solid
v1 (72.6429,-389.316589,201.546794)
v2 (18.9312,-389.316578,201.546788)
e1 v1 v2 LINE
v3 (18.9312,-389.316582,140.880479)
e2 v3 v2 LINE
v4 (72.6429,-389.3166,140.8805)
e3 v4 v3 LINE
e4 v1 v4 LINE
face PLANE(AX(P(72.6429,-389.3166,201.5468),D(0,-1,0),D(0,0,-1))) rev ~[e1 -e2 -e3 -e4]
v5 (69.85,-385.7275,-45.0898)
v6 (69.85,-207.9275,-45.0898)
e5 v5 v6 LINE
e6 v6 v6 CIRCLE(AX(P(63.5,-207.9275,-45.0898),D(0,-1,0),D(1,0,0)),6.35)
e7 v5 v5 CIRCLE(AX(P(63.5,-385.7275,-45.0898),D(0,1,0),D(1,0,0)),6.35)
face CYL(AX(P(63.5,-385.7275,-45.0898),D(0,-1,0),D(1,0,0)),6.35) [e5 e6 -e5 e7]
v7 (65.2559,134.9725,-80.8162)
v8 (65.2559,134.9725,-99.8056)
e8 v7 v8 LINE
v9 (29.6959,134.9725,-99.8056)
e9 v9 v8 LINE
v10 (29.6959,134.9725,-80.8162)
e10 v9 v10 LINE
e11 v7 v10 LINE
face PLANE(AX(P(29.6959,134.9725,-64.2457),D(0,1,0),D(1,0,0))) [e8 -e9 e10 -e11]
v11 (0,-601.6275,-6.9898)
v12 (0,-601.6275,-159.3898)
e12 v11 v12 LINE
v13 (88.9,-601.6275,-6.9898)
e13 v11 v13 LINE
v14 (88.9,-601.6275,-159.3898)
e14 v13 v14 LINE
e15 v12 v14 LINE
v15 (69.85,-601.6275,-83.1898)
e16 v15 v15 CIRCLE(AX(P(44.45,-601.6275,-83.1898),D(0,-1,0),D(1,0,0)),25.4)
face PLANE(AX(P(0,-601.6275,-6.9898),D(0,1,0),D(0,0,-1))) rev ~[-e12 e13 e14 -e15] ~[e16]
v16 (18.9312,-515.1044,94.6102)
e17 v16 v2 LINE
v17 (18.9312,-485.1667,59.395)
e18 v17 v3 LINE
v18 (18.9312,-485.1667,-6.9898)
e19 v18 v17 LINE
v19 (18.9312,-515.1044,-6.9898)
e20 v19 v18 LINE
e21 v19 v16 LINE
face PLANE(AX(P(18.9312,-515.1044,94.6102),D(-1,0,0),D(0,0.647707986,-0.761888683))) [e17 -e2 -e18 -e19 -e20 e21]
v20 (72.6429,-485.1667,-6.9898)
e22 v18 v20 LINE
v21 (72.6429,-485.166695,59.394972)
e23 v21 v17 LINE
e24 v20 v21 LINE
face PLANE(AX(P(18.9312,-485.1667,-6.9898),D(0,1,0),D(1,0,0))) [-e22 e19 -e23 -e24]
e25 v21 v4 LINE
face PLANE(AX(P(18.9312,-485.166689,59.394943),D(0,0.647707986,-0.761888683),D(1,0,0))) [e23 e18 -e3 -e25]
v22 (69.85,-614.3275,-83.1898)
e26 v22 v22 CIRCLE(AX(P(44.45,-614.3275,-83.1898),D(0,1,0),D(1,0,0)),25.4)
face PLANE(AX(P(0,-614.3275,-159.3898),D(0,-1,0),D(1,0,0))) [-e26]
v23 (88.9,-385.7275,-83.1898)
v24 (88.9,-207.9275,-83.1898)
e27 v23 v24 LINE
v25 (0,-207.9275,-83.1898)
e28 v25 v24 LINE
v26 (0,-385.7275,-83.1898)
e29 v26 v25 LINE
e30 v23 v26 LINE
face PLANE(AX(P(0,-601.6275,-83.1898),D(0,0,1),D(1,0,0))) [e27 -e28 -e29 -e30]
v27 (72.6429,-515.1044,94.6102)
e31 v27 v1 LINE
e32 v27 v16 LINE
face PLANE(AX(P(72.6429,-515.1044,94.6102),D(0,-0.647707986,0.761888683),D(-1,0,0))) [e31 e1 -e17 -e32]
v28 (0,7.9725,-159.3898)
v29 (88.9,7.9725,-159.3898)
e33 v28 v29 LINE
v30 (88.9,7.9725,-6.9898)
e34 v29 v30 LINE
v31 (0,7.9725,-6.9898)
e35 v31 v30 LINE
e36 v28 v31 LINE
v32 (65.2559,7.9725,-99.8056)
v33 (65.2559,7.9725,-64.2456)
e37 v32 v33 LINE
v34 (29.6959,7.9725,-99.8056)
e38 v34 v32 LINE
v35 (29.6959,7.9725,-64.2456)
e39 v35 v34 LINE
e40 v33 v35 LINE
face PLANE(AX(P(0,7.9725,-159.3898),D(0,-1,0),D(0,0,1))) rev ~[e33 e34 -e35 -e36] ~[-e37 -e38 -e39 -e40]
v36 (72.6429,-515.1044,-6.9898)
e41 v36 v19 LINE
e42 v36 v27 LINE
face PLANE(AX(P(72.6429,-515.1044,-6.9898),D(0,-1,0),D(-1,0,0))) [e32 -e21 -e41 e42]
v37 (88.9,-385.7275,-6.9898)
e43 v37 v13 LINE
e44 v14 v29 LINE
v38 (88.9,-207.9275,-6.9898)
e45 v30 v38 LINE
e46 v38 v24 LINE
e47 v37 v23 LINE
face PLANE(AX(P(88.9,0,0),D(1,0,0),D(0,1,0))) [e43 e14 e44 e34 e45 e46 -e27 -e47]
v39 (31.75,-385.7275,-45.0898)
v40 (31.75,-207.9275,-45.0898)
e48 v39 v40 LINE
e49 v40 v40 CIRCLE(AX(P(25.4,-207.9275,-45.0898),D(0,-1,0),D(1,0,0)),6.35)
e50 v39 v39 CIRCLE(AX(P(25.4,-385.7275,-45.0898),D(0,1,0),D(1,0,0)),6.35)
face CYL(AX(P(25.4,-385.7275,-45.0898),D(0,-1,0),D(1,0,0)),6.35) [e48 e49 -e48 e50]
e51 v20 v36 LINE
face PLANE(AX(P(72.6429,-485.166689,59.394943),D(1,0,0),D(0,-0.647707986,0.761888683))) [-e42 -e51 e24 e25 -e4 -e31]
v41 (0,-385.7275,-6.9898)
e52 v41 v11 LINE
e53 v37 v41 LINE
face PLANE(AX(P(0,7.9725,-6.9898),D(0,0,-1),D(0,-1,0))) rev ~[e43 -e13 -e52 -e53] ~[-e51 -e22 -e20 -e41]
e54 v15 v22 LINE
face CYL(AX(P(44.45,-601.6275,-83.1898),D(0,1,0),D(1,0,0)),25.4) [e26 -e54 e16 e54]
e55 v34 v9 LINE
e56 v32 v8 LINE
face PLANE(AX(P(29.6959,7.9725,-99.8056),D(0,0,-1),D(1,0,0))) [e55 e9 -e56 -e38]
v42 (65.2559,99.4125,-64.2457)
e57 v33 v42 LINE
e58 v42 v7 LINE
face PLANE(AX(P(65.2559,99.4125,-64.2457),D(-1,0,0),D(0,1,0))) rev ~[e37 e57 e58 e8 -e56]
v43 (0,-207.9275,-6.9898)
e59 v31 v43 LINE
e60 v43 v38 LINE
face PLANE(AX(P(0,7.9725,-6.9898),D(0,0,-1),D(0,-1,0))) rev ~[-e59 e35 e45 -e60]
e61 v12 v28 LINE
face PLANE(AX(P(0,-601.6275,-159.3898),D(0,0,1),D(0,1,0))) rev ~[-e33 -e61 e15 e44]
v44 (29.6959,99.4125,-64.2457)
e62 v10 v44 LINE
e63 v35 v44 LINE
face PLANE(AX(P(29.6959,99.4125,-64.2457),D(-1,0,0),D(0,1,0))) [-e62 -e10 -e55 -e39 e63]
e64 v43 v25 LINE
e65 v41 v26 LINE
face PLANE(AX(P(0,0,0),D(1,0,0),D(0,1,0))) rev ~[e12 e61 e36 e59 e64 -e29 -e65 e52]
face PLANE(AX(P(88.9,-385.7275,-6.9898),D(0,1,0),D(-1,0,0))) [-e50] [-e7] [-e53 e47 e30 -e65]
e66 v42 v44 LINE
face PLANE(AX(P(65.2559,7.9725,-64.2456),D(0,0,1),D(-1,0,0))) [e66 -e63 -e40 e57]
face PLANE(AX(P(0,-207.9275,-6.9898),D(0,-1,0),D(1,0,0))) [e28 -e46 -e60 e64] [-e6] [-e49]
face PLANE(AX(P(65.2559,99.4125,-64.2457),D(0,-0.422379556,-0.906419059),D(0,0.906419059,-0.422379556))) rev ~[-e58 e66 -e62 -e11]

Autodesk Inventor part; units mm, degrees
ref_plane "YZ Plane" through (0, 0, 0) normal (1, 0, 0) x (0, 1, 0)
ref_plane "XZ Plane" through (0, 0, 0) normal (0, 1, 0) x (-1, 0, 0)
ref_plane "XY Plane" through (0, 0, 0) normal (0, 0, 1) x (1, 0, 0)
sketch "Sketch1" plane through (0, 0, 0) normal (1, 0, 0) x (0, 1, 0)
  line L0 (7.9725, -6.9898) -> (-601.6275, -6.9898)
  line L1 (-601.6275, -6.9898) -> (-601.6275, -159.3898)
  line L2 (-601.6275, -159.3898) -> (7.9725, -159.3898)
  line L3 (7.9725, -159.3898) -> (7.9725, -6.9898)
  point P0 (0, 0)
  dimension "d0" = 609.6
  dimension "d1" = 152.4
extrude "Extrusion1" add sketch "Sketch1" along normal blind 88.9
sketch "Sketch2" plane through (0, -601.6275, -6.9898) normal (0, 0, 1) x (1, 0, 0)
  line L0 (0, 0) -> (0, 609.6) projected
  line L1 (0, 609.6) -> (0, 393.7)
  line L2 (0, 0) -> (88.9, 0) projected
  line L3 (0, 0) -> (0, 215.9)
  line L4 (88.9, 0) -> (88.9, 609.6) projected
  line L5 (0, 393.7) -> (88.9, 393.7)
  line L6 (88.9, 393.7) -> (88.9, 215.9)
  line L7 (88.9, 215.9) -> (0, 215.9)
  line L8 (0, 215.9) -> (0, 393.7)
  line L9 (0, 393.7) -> (0, 215.9)
  point P0 (0, 601.6275)
  point P1 (0, 215.9)
  dimension "d4" = 215.9
  dimension "d5" = 215.9
extrude "Extrusion2" cut sketch "Sketch2" against normal blind 76.2 contours L0 L5 L4 L7
sketch "Sketch3" plane through (88.9, 0, 0) normal (1, 0, 0) x (0, 0, -1)
  point P0 (0, 0)
sketch "Sketch4" plane through (0, -601.6275, -6.9898) normal (0, 0, 1) x (1, 0, 0)
  line L0 (18.9312, 116.4608) -> (72.6429, 116.4608)
  line L1 (72.6429, 116.4608) -> (72.6429, 86.5231)
  line L2 (72.6429, 86.5231) -> (18.9312, 86.5231)
  line L3 (18.9312, 86.5231) -> (18.9312, 116.4608)
  point P0 (0, 601.6275)
extrude "Extrusion3" add sketch "Sketch4" along normal blind 101.6
sketch "Sketch5" plane through (72.6429, -515.1044, -6.9898) normal (1, 0, 0) x (0, 0, -1)
  line L0 (-101.6, 0) -> (-66.3848, 29.9377)
  line L1 (0, 29.9377) -> (-101.6, 29.9377) projected
  line L2 (-101.6, 0) -> (-101.6, 29.9377) projected
  line L3 (-101.6, 0) -> (-101.6, 29.9377)
  point P0 (-6.9898, 515.1044)
extrude "Extrusion4" cut sketch "Sketch5" against normal through all
sketch "Sketch6" plane through (18.9312, -515.1044, 94.6102) normal (0, 0.7618887, 0.647708) x (1, 0, 0)
  line L0 (0, 46.221) -> (53.7117, 46.221) projected
  line L1 (53.7117, 77.4079) -> (53.7117, 0) projected
  line L2 (0, 46.221) -> (53.7117, 46.221)
  line L3 (53.7117, 46.221) -> (53.7117, 0)
  line L4 (53.7117, 0) -> (0, 0)
  line L5 (0, 0) -> (0, 46.221)
  point P0 (-18.9312, 405.7197)
extrude "Extrusion5" add sketch "Sketch6" along normal blind 165.1
sketch "Sketch7" plane through (72.6429, -515.1044, -6.9898) normal (1, 0, 0) x (0, 0, -1)
  point P0 (-6.9898, 515.1044)
sketch "Sketch8" plane through (72.6429, -515.1044, -6.9898) normal (1, 0, 0) x (0, 0, -1)
  line L0 (-173.3214, 155.7255) -> (-208.5366, 125.7878) projected
  line L1 (-208.5366, 125.7878) -> (-147.8703, 125.7878)
  line L2 (-66.3848, 29.9377) -> (-173.3214, 155.7255) projected
  line L3 (-173.3214, 155.7255) -> (-208.5366, 125.7878)
  line L4 (-147.8703, 125.7878) -> (-173.3214, 155.7255)
  point P0 (-6.9898, 515.1044)
extrude "Extrusion6" cut sketch "Sketch8" against normal through all
sketch "Sketch9" plane through (72.6429, -389.3166, 201.5467) normal (0, 1, 0) x (1, 0, 0)
  point P0 (-72.6429, 201.5467)
sketch "Sketch10" plane through (0, -385.7275, -6.9898) normal (0, 1, 0) x (1, 0, 0)
  point P0 (0, -6.9898)
sketch "Sketch11" plane through (0, -385.7275, -6.9898) normal (0, 1, 0) x (1, 0, 0)
  point P0 (0, -6.9898)
sketch "Sketch12" plane through (0, -385.7275, -6.9898) normal (0, 1, 0) x (1, 0, 0)
  point P0 (0, -6.9898)
sketch "Sketch13" plane through (0, 0, 0) normal (-1, 0, 0) x (0, 0, 1)
  point P0 (0, 0)
sketch "Sketch14" plane through (0, -385.7275, -6.9898) normal (0, 1, 0) x (1, 0, 0)
  line L0 (88.9, 76.2) -> (0, 76.2) projected
  line L1 (0, 0) -> (0, 76.2) projected
  line L2 (88.9, 76.2) -> (0, 76.2)
  line L3 (88.9, 76.2) -> (88.9, 0) projected
  line L4 (0, 76.2) -> (88.9, 76.2)
  line L5 (88.9, 76.2) -> (0, 76.2)
  line L6 (0, 76.2) -> (0, 0)
  line L7 (0, 0) -> (88.9, 0)
  line L8 (88.9, 0) -> (88.9, 76.2)
  point P0 (0, -6.9898)
sketch "Sketch15" plane through (0, -385.7275, -6.9898) normal (0, 1, 0) x (1, 0, 0)
  line L0 (88.9, 76.2) -> (88.9, 0) projected
  line L1 (88.9, 38.1) -> (0, 38.1)
  line L2 (0, 0) -> (0, 76.2) projected
  line L3 (88.9, 76.2) -> (0, 76.2)
  circle A0 centre (63.5, 38.1) radius 6.35
  circle A1 centre (25.4, 38.1) radius 6.35
  point P0 (0, -6.9898)
  dimension "d20" = 12.7
  dimension "d21" = 12.7
extrude "Extrusion7" add sketch "Sketch15" along normal blind 177.8 contours A0 L1 | L1 A0 | A1 L1 | L1 A1
sketch "Sketch16" plane through (0, 7.9725, -6.9898) normal (0, 1, 0) x (1, 0, 0)
  line L0 (29.6959, 92.8158) -> (65.2559, 92.8158)
  line L1 (65.2559, 92.8158) -> (65.2559, 57.2558)
  line L2 (65.2559, 57.2558) -> (29.6959, 57.2558)
  line L3 (29.6959, 57.2558) -> (29.6959, 92.8158)
  point P0 (0, -6.9898)
  dimension "d24" = 35.56
  dimension "d25" = 35.56
extrude "Extrusion8" add sketch "Sketch16" along normal blind 127
sketch "Sketch17" plane through (29.6959, 7.9725, -64.2457) normal (0, 0, 1) x (1, 0, 0)
  line L0 (0, 127) -> (35.56, 127) projected
  line L1 (35.56, 0) -> (35.56, 127) projected
  line L2 (0, 127) -> (35.56, 127)
  line L3 (35.56, 127) -> (35.56, 91.44)
  line L4 (35.56, 91.44) -> (0, 91.44)
  line L5 (0, 91.44) -> (0, 127)
  point P0 (-29.6959, -7.9725)
  dimension "d28" = 35.56
extrude "Extrusion9" add sketch "Sketch17" along normal blind 127
sketch "Sketch18" plane through (65.2559, 7.9725, -64.2457) normal (1, 0, 0) x (0, 0, -1)
  line L0 (0, 91.44) -> (-127, 91.44) projected
  line L1 (-64.2457, 91.44) -> (-45.72, 127)
  line L2 (35.56, 127) -> (-127, 127) projected
  line L3 (-45.72, 127) -> (-127, 127)
  line L4 (-127, 127) -> (-127, 91.44) projected
  line L5 (-127, 91.44) -> (-64.2457, 91.44)
  line L6 (-127, 127) -> (-127, 91.44)
  line L7 (35.56, 127) -> (-127, 127) projected
  line L8 (0, 127) -> (-14.8626, 91.44)
  line L9 (-64.2457, 91.44) -> (-14.8626, 91.44)
  line L10 (-14.8626, 91.44) -> (0, 127)
  line L11 (-45.72, 127) -> (-127, 127)
  line L12 (0, 127) -> (-49.9714, 127)
  point P0 (-64.2457, -7.9725)
extrude "Extrusion10" cut sketch "Sketch18" against normal through all contours L0 L4 L2 L1
sketch "Sketch19" plane through (65.2559, 7.9725, -64.2457) normal (1, 0, 0) x (0, 0, -1)
  line L0 (0, 91.44) -> (-64.2457, 91.44) projected
  line L1 (-32.1228, 91.44) -> (-14.9944, 127)
  line L2 (35.56, 127) -> (-45.72, 127) projected
  line L3 (-32.1228, 91.44) -> (-64.2457, 91.44)
  line L4 (-64.2457, 91.44) -> (-45.72, 127) projected
  line L5 (-64.2457, 91.44) -> (-45.72, 127)
  line L6 (-45.72, 127) -> (-14.9944, 127)
  point P0 (-64.2457, -7.9725)
extrude "Extrusion11" cut sketch "Sketch19" against normal through all
sketch "Sketch20" plane through (65.2559, 7.9725, -64.2457) normal (1, 0, 0) x (0, 0, -1)
  line L0 (35.56, 127) -> (-14.9944, 127) projected
  line L1 (-0.2658, 127) -> (-21.0098, 91.44)
  line L2 (0, 91.44) -> (-32.1228, 91.44) projected
  line L3 (-21.0098, 91.44) -> (-32.1228, 91.44)
  line L4 (-32.1228, 91.44) -> (-14.9944, 127) projected
  line L5 (-32.1228, 91.44) -> (-14.9944, 127)
  line L6 (-14.9944, 127) -> (-0.2658, 127)
  point P0 (-64.2457, -7.9725)
extrude "Extrusion12" cut sketch "Sketch20" against normal through all
sketch "Sketch21" plane through (0, 7.9725, -6.9898) normal (0, 1, 0) x (1, 0, 0)
  point P0 (0, -6.9898)
sketch "Sketch22" plane through (65.2559, 7.9725, -64.2457) normal (1, 0, 0) x (0, 0, -1)
  line L0 (-0.2658, 127) -> (-21.0098, 91.44) projected
  line L1 (-21.0098, 91.44) -> (-0.2658, 127)
  line L2 (-0.2658, 127) -> (16.5705, 127)
  line L3 (35.56, 127) -> (-0.2658, 127) projected
  line L4 (0, 0) -> (0, 91.44) projected
  line L5 (0, 91.44) -> (16.5705, 127)
  line L6 (0, 91.44) -> (-21.0098, 91.44) projected
  line L7 (0, 91.44) -> (-21.0098, 91.44)
  point P0 (-64.2457, -7.9725)
extrude "Extrusion13" cut sketch "Sketch22" against normal through all
sketch "Sketch23" plane through (0, -385.7275, -6.9898) normal (0, 1, 0) x (1, 0, 0)
  point P0 (0, -6.9898)
sketch "Sketch24" plane through (0, -601.6275, -159.3898) normal (0, -1, 0) x (1, 0, 0)
  line L0 (0, 152.4) -> (88.9, 152.4) projected
  line L1 (88.9, 152.4) -> (88.9, 0) projected
  line L2 (0, 0) -> (88.9, 0) projected
  line L3 (0, 76.2) -> (88.9, 76.2) projected
  circle A0 centre (44.45, 76.2) radius 25.4
  point P0 (0, 159.3898)
extrude "Extrusion14" add sketch "Sketch24" along normal blind 12.7
properties part number "exploration cuboid" material "Silicon Nitride"
